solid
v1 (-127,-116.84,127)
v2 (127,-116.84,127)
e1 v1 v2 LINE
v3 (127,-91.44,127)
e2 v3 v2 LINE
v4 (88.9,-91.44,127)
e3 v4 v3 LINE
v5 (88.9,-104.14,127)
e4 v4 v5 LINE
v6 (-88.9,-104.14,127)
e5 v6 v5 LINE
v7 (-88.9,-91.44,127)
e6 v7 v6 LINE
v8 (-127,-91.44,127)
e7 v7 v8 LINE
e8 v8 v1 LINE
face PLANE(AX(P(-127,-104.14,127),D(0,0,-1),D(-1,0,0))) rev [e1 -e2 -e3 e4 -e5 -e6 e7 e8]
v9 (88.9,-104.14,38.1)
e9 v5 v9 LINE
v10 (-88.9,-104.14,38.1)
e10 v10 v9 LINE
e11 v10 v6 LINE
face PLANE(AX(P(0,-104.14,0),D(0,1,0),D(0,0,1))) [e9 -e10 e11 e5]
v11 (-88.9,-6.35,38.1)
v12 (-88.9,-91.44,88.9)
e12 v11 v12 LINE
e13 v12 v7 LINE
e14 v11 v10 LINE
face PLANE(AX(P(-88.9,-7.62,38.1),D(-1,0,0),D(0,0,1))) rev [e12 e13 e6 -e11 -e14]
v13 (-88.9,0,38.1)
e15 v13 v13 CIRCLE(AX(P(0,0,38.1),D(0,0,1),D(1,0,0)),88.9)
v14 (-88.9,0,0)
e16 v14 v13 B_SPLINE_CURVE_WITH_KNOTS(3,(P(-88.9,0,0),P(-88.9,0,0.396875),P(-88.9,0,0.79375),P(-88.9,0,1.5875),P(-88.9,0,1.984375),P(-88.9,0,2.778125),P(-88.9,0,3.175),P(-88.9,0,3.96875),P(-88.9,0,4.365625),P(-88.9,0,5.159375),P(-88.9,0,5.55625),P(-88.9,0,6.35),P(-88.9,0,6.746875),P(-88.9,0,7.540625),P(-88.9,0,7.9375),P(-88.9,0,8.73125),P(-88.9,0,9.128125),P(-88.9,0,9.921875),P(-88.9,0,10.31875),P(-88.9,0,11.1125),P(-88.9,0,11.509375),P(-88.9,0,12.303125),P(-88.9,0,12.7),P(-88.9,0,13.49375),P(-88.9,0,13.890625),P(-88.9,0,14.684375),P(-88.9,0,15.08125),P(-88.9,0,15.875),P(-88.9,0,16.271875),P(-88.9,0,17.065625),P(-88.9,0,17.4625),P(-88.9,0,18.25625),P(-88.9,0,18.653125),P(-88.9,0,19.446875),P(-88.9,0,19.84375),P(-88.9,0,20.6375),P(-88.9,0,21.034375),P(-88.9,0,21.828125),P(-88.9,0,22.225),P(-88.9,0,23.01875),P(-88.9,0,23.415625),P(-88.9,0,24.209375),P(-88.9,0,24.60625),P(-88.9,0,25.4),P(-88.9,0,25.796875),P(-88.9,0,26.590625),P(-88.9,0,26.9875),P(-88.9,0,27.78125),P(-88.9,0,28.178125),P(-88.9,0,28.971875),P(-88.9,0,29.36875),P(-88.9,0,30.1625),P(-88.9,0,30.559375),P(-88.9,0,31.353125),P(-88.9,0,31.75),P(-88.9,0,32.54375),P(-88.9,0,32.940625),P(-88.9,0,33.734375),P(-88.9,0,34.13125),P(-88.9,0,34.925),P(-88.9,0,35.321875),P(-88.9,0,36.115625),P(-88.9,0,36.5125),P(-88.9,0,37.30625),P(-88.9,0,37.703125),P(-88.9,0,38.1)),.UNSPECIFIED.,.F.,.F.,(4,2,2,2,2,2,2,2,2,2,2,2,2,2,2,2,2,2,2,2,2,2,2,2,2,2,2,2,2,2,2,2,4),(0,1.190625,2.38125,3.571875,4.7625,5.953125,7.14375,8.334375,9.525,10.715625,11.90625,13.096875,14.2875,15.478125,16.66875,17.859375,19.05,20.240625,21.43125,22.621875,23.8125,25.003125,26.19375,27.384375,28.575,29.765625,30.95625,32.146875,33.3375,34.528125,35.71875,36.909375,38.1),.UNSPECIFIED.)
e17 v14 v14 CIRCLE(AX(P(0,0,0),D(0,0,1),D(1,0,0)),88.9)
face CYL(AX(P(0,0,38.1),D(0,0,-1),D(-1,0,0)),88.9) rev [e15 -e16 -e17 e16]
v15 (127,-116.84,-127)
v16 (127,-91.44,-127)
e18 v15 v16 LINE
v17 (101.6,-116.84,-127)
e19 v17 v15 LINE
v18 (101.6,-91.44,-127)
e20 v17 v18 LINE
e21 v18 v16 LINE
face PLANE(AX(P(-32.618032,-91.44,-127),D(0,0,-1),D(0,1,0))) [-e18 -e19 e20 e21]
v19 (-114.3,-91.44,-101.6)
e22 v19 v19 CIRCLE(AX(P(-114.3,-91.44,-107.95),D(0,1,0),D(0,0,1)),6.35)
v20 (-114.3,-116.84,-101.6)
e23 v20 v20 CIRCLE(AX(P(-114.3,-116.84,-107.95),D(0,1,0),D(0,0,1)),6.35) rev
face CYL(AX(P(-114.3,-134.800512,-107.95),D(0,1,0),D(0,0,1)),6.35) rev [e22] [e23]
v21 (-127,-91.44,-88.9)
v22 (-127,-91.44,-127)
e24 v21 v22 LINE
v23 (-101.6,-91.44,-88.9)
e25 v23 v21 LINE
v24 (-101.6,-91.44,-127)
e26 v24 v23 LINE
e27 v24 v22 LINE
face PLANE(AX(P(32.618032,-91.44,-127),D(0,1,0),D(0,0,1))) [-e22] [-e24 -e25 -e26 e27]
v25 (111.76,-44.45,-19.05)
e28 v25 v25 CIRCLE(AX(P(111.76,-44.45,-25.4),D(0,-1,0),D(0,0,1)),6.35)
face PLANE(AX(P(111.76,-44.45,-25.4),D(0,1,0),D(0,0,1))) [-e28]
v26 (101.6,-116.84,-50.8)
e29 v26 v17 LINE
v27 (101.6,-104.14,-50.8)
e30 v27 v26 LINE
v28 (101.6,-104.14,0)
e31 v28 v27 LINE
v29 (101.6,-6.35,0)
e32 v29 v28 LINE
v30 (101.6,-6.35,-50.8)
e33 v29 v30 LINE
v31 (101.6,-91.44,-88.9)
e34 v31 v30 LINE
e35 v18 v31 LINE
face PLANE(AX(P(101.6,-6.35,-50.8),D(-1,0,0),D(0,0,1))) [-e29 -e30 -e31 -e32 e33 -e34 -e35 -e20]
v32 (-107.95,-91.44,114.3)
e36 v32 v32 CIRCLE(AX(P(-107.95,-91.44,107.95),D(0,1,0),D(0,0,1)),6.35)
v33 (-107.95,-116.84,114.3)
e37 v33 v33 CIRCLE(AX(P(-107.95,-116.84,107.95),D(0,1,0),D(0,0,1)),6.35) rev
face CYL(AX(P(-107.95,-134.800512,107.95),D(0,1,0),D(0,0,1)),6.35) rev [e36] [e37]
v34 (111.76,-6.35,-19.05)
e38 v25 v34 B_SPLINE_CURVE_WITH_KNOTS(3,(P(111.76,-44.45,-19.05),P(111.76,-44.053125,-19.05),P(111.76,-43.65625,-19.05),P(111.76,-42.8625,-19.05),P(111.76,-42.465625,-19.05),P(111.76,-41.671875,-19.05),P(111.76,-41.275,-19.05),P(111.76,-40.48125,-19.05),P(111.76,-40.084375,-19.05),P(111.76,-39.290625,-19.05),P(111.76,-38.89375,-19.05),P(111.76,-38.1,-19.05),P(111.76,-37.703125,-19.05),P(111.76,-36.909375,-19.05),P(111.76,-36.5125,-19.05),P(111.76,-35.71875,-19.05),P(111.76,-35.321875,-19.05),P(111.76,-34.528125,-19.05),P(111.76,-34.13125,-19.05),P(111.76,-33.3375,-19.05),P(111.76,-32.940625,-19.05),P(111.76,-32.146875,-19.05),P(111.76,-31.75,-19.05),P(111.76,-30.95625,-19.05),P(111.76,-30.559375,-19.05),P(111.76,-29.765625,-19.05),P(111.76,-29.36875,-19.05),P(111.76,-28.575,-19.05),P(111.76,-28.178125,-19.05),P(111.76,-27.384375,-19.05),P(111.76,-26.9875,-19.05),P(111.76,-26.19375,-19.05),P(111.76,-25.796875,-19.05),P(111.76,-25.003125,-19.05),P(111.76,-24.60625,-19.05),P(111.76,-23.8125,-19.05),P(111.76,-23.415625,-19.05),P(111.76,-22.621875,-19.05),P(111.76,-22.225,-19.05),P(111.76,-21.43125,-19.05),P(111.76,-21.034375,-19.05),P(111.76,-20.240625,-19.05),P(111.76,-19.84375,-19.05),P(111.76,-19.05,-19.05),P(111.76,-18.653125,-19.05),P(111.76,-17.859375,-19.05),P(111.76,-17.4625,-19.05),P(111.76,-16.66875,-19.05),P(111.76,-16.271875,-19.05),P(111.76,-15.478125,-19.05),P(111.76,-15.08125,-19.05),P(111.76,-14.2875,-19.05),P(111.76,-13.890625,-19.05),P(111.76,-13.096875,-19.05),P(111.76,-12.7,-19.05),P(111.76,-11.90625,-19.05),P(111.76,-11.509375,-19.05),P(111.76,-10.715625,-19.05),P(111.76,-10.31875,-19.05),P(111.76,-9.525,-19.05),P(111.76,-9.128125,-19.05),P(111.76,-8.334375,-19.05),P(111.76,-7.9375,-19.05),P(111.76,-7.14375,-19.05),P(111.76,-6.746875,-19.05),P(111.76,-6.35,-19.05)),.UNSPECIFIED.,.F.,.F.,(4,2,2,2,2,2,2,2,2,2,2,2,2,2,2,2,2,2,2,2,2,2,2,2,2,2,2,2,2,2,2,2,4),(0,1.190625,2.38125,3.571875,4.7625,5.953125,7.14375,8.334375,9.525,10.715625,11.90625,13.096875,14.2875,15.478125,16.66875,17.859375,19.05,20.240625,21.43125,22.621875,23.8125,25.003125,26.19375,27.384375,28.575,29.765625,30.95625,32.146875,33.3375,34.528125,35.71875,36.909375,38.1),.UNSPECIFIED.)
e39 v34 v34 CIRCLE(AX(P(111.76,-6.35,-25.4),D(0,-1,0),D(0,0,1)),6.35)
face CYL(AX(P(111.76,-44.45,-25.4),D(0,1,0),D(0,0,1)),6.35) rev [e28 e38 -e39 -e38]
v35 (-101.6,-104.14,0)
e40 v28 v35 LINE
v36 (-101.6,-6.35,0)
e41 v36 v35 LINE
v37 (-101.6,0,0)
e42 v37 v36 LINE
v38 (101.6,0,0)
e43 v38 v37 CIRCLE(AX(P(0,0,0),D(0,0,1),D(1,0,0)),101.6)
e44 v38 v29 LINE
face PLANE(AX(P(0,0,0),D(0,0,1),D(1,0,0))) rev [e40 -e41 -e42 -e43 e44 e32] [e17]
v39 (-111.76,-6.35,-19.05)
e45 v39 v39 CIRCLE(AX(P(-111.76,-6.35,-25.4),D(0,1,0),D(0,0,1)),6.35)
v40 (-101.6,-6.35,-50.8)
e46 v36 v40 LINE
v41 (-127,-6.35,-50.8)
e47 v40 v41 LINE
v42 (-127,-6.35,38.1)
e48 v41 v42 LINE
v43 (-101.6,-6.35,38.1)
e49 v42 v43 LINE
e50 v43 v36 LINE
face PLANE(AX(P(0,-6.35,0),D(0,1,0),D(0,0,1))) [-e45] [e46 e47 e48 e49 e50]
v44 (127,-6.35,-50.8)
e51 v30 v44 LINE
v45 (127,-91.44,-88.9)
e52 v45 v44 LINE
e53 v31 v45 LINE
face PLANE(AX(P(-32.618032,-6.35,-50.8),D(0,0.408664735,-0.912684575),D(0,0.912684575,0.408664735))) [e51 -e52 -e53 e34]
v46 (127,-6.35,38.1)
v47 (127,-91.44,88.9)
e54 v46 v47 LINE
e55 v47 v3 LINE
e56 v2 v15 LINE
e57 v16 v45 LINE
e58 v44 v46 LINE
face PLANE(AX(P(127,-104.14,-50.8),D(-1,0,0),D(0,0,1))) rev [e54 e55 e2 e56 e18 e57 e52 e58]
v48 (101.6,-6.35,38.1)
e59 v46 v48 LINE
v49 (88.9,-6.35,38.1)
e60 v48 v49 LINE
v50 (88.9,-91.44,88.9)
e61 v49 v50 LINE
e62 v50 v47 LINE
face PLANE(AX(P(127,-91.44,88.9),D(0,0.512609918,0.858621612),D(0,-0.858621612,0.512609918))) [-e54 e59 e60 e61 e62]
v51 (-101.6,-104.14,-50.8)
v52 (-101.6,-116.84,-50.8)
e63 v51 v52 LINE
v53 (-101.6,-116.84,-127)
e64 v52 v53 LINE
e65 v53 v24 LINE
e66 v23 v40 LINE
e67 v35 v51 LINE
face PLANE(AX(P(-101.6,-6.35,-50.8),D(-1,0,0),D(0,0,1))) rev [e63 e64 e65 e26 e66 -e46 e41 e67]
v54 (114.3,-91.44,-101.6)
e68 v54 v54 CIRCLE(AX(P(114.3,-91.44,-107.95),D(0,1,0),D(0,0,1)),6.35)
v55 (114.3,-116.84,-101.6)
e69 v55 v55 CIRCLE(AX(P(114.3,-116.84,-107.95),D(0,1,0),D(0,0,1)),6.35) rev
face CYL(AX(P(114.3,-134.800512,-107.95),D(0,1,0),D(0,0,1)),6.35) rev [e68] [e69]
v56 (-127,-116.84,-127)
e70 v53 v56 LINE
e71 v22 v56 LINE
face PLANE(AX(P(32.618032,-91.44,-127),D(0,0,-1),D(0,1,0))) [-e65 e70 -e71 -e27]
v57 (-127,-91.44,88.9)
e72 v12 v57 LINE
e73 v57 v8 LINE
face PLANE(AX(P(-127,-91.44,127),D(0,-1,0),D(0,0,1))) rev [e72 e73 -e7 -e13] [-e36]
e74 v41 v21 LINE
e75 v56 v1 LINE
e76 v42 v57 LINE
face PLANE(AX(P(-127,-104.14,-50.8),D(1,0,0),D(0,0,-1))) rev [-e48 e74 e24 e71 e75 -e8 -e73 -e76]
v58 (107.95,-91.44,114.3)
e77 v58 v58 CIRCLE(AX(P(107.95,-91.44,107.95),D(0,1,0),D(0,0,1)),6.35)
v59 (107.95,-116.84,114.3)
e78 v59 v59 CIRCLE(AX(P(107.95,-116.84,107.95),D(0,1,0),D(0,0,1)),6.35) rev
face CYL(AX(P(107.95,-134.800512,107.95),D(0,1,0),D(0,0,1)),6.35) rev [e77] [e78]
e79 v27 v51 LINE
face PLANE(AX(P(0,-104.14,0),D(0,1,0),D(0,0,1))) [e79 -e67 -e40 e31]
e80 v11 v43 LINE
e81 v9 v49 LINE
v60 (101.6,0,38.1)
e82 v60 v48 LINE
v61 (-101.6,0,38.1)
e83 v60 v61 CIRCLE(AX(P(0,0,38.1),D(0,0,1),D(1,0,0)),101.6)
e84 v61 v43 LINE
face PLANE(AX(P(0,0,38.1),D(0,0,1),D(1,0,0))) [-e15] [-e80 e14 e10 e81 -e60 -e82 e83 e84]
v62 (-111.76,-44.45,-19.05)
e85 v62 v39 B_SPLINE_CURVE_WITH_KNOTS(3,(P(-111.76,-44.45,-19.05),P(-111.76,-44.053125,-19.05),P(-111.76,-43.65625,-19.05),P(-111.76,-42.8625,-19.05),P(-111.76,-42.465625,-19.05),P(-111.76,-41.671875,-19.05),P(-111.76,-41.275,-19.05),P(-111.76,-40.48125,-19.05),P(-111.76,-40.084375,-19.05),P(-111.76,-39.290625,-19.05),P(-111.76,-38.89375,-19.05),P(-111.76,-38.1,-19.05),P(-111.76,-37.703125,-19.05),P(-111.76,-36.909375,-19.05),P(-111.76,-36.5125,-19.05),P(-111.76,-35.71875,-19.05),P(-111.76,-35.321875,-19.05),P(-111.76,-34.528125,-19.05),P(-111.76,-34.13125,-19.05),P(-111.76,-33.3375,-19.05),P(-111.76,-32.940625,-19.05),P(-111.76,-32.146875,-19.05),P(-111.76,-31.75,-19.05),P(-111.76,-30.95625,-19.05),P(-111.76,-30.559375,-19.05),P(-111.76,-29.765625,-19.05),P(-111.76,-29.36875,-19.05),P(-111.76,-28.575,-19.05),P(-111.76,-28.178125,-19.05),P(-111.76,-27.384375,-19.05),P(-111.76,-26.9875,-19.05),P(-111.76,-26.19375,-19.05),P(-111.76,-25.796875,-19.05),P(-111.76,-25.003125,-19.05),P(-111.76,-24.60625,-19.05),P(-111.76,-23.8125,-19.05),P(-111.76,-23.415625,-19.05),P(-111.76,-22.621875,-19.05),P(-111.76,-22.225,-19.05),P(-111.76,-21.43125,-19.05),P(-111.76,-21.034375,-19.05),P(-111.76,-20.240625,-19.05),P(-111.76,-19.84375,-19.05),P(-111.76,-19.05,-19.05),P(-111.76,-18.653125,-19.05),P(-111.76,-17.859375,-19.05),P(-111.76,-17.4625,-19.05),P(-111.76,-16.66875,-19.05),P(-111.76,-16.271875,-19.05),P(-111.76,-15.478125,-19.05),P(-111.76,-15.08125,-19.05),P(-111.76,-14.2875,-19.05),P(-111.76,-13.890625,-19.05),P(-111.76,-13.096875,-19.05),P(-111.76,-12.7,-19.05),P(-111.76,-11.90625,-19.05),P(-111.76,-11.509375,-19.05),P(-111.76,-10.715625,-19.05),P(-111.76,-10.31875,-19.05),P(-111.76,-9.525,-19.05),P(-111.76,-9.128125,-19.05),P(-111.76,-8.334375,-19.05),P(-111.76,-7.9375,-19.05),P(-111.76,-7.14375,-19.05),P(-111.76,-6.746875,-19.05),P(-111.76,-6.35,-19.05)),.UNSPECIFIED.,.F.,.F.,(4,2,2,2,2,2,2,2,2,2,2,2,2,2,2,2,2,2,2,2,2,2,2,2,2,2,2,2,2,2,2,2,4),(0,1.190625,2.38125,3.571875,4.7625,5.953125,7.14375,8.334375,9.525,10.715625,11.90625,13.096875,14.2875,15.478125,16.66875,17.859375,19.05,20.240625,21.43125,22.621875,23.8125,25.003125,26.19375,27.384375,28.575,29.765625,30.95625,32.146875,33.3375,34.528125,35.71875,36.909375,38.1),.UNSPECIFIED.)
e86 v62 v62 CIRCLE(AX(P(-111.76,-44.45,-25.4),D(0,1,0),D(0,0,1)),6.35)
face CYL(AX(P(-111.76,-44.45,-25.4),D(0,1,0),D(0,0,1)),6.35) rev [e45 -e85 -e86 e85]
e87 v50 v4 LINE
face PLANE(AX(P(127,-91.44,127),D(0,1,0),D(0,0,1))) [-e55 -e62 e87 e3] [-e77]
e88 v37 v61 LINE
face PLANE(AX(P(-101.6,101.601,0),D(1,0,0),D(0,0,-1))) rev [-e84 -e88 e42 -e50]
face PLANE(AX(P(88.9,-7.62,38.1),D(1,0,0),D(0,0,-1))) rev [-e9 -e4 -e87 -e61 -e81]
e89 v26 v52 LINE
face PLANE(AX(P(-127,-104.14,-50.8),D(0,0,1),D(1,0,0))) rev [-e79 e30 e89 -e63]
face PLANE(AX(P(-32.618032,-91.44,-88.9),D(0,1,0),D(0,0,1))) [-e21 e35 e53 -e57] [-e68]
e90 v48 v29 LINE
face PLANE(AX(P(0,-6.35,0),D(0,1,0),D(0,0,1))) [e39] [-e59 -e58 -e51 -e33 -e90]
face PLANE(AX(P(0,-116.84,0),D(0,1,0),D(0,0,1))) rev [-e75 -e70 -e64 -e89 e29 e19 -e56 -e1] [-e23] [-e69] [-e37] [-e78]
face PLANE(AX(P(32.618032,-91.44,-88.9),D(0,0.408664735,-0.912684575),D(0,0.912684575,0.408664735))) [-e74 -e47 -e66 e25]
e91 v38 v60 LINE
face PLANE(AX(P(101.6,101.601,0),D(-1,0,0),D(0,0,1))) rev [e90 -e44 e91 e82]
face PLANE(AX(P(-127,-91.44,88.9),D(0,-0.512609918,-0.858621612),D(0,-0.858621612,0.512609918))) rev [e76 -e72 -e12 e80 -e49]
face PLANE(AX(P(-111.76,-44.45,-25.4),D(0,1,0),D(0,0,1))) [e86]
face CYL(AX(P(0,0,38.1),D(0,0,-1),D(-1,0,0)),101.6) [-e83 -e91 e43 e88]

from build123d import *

# Parameters (mm, degrees)
SKETCH1_R                = 101.6
SKETCH1_R_2              = 88.9
BOSS_EXTRUDE1_DEPTH      = 38.1
SKETCH2_W                = 254
SKETCH2_H                = 177.8
BOSS_EXTRUDE2_DEPTH      = 12.7
BOSS_EXTRUDE3_REACH      = 275.106
BOSS_EXTRUDE3_END_RADIUS = 101.6
SKETCH3_W                = 203.2
SKETCH3_H                = 38.1
SKETCH10_W               = 25.4
SKETCH10_H               = 88.9
BOSS_EXTRUDE5_DEPTH      = 97.79
SKETCH11_R               = 6.35
CUT_EXTRUDE1_DEPTH       = 38.1
RIB3_START               = -38.1
RIB3_DEPTH               = 38.1
BOSS_EXTRUDE6_DEPTH      = 25.4
BOSS_EXTRUDE7_DEPTH      = 25.4
SKETCH17_R               = 6.35
CUT_EXTRUDE2_DEPTH       = 25.4


# Read off the part's stored shape, not the designer's step: Rib3
with BuildPart() as part:
    # Sketch1 → Boss-Extrude1 (new body)
    with BuildSketch(Plane.XY):
        with Locations(Location((0, 0, 0), (0, 0, 180))):
            Circle(SKETCH1_R)
        with Locations(Location((0, 0, 0), (0, 0, 180))):
            Circle(SKETCH1_R_2, mode=Mode.SUBTRACT)
    extrude(amount=BOSS_EXTRUDE1_DEPTH)



with BuildPart() as body_2:
    # Sketch2 → Boss-Extrude2 (new body)
    with BuildSketch(Plane(origin=(0, -116.84, 0), x_dir=(1, 0, 0), z_dir=(0, 1, 0))):
        with Locations((0, -38.1)):
            Rectangle(SKETCH2_W, SKETCH2_H)
    extrude(amount=BOSS_EXTRUDE2_DEPTH)


with BuildPart() as part_1:
    add(part.part)

    add(body_2.part)  # Boss-Extrude3 merges body 2
    # Boss-Extrude3: up to this cylinder (the profile starts outside it)
    boss_extrude3_end = Plane(origin=(0, 0, 19.05), z_dir=(0, 0, -1)) * Cylinder(BOSS_EXTRUDE3_END_RADIUS, 754.412, mode=Mode.PRIVATE)
    # Sketch3 → Boss-Extrude3 (add, up to the surface)
    with BuildSketch(Plane(origin=(0, -104.14, 0), x_dir=(1, 0, 0), z_dir=(0, 1, 0)), mode=Mode.PRIVATE) as boss_extrude3_sk1:
        with Locations((0, -19.05)):
            Rectangle(SKETCH3_W, SKETCH3_H)
    boss_extrude3_tool1 = extrude(boss_extrude3_sk1.sketch, amount=BOSS_EXTRUDE3_REACH, mode=Mode.PRIVATE) - boss_extrude3_end
    add(boss_extrude3_tool1.solids().sort_by_distance((0, -104.14, 19.05))[0])

    # Sketch10 → Boss-Extrude5 (add)
    with BuildSketch(Plane(origin=(0, -104.14, 0), x_dir=(1, 0, 0), z_dir=(0, 1, 0))):
        with Locations((-114.3, 6.35)):
            Rectangle(SKETCH10_W, SKETCH10_H)
    boss_extrude5 = extrude(amount=BOSS_EXTRUDE5_DEPTH)

    # Mirror1: Boss-Extrude5 across plane
    add(boss_extrude5.mirror(Plane(origin=(0, 0, 0), x_dir=(0, 0, 1), z_dir=(1, 0, 0))))

    # Sketch11 → Cut-Extrude1 (cut)
    with BuildSketch(Plane(origin=(0, -6.35, 0), x_dir=(1, 0, 0), z_dir=(0, 1, 0))):
        with Locations(Location((-111.76, 25.4, 0), (0, 0, 270))):
            Circle(SKETCH11_R)
    cut_extrude1 = extrude(amount=-CUT_EXTRUDE1_DEPTH, mode=Mode.SUBTRACT)

    # Mirror2: Cut-Extrude1 across plane
    add(cut_extrude1.mirror(Plane(origin=(0, 0, 0), x_dir=(0, 0, 1), z_dir=(1, 0, 0))), mode=Mode.SUBTRACT)

    # Rib3 outline → Rib3 (add)
    with BuildSketch(Plane.ZY.offset(127).offset(RIB3_START)):
        Polygon((127, -104.14), (127, -91.44), (88.9, -91.44), (38.1, -6.35), (38.1, -104.14), align=None)
    rib3 = extrude(amount=RIB3_DEPTH)

    # Mirror3: Rib3 across plane
    add(rib3.mirror(Plane(origin=(0, 0, 0), x_dir=(0, 0, 1), z_dir=(1, 0, 0))))

    # Sketch15 → Boss-Extrude6 (add)
    with BuildSketch(Plane.ZY.offset(127)):
        Polygon((-50.8, -6.35), (-50.8, -116.84), (-127, -116.84), (-127, -91.44), (-88.9, -91.44), align=None)
    extrude(amount=-BOSS_EXTRUDE6_DEPTH)

    # Sketch16 → Boss-Extrude7 (add)
    with BuildSketch(Plane(origin=(127, 0, 0), x_dir=(0, 0, -1), z_dir=(1, 0, 0))):
        Polygon((50.8, -6.35), (88.9, -91.44), (127, -91.44), (127, -116.84), (50.8, -116.84), align=None)
    extrude(amount=-BOSS_EXTRUDE7_DEPTH)

    # Sketch17 → Cut-Extrude2 (cut)
    with BuildSketch(Plane(origin=(0, -91.44, 0), x_dir=(1, 0, 0), z_dir=(0, 1, 0))):
        with Locations(Location((114.3, 107.95, 0), (0, 0, 270))):
            Circle(SKETCH17_R)
        with Locations(Location((-114.3, 107.95, 0), (0, 0, 270))):
            Circle(SKETCH17_R)
        with Locations(Location((-107.95, -107.95, 0), (0, 0, 270))):
            Circle(SKETCH17_R)
        with Locations(Location((107.95, -107.95, 0), (0, 0, 270))):
            Circle(SKETCH17_R)
    extrude(amount=-CUT_EXTRUDE2_DEPTH, mode=Mode.SUBTRACT)


solid = part_1.part
